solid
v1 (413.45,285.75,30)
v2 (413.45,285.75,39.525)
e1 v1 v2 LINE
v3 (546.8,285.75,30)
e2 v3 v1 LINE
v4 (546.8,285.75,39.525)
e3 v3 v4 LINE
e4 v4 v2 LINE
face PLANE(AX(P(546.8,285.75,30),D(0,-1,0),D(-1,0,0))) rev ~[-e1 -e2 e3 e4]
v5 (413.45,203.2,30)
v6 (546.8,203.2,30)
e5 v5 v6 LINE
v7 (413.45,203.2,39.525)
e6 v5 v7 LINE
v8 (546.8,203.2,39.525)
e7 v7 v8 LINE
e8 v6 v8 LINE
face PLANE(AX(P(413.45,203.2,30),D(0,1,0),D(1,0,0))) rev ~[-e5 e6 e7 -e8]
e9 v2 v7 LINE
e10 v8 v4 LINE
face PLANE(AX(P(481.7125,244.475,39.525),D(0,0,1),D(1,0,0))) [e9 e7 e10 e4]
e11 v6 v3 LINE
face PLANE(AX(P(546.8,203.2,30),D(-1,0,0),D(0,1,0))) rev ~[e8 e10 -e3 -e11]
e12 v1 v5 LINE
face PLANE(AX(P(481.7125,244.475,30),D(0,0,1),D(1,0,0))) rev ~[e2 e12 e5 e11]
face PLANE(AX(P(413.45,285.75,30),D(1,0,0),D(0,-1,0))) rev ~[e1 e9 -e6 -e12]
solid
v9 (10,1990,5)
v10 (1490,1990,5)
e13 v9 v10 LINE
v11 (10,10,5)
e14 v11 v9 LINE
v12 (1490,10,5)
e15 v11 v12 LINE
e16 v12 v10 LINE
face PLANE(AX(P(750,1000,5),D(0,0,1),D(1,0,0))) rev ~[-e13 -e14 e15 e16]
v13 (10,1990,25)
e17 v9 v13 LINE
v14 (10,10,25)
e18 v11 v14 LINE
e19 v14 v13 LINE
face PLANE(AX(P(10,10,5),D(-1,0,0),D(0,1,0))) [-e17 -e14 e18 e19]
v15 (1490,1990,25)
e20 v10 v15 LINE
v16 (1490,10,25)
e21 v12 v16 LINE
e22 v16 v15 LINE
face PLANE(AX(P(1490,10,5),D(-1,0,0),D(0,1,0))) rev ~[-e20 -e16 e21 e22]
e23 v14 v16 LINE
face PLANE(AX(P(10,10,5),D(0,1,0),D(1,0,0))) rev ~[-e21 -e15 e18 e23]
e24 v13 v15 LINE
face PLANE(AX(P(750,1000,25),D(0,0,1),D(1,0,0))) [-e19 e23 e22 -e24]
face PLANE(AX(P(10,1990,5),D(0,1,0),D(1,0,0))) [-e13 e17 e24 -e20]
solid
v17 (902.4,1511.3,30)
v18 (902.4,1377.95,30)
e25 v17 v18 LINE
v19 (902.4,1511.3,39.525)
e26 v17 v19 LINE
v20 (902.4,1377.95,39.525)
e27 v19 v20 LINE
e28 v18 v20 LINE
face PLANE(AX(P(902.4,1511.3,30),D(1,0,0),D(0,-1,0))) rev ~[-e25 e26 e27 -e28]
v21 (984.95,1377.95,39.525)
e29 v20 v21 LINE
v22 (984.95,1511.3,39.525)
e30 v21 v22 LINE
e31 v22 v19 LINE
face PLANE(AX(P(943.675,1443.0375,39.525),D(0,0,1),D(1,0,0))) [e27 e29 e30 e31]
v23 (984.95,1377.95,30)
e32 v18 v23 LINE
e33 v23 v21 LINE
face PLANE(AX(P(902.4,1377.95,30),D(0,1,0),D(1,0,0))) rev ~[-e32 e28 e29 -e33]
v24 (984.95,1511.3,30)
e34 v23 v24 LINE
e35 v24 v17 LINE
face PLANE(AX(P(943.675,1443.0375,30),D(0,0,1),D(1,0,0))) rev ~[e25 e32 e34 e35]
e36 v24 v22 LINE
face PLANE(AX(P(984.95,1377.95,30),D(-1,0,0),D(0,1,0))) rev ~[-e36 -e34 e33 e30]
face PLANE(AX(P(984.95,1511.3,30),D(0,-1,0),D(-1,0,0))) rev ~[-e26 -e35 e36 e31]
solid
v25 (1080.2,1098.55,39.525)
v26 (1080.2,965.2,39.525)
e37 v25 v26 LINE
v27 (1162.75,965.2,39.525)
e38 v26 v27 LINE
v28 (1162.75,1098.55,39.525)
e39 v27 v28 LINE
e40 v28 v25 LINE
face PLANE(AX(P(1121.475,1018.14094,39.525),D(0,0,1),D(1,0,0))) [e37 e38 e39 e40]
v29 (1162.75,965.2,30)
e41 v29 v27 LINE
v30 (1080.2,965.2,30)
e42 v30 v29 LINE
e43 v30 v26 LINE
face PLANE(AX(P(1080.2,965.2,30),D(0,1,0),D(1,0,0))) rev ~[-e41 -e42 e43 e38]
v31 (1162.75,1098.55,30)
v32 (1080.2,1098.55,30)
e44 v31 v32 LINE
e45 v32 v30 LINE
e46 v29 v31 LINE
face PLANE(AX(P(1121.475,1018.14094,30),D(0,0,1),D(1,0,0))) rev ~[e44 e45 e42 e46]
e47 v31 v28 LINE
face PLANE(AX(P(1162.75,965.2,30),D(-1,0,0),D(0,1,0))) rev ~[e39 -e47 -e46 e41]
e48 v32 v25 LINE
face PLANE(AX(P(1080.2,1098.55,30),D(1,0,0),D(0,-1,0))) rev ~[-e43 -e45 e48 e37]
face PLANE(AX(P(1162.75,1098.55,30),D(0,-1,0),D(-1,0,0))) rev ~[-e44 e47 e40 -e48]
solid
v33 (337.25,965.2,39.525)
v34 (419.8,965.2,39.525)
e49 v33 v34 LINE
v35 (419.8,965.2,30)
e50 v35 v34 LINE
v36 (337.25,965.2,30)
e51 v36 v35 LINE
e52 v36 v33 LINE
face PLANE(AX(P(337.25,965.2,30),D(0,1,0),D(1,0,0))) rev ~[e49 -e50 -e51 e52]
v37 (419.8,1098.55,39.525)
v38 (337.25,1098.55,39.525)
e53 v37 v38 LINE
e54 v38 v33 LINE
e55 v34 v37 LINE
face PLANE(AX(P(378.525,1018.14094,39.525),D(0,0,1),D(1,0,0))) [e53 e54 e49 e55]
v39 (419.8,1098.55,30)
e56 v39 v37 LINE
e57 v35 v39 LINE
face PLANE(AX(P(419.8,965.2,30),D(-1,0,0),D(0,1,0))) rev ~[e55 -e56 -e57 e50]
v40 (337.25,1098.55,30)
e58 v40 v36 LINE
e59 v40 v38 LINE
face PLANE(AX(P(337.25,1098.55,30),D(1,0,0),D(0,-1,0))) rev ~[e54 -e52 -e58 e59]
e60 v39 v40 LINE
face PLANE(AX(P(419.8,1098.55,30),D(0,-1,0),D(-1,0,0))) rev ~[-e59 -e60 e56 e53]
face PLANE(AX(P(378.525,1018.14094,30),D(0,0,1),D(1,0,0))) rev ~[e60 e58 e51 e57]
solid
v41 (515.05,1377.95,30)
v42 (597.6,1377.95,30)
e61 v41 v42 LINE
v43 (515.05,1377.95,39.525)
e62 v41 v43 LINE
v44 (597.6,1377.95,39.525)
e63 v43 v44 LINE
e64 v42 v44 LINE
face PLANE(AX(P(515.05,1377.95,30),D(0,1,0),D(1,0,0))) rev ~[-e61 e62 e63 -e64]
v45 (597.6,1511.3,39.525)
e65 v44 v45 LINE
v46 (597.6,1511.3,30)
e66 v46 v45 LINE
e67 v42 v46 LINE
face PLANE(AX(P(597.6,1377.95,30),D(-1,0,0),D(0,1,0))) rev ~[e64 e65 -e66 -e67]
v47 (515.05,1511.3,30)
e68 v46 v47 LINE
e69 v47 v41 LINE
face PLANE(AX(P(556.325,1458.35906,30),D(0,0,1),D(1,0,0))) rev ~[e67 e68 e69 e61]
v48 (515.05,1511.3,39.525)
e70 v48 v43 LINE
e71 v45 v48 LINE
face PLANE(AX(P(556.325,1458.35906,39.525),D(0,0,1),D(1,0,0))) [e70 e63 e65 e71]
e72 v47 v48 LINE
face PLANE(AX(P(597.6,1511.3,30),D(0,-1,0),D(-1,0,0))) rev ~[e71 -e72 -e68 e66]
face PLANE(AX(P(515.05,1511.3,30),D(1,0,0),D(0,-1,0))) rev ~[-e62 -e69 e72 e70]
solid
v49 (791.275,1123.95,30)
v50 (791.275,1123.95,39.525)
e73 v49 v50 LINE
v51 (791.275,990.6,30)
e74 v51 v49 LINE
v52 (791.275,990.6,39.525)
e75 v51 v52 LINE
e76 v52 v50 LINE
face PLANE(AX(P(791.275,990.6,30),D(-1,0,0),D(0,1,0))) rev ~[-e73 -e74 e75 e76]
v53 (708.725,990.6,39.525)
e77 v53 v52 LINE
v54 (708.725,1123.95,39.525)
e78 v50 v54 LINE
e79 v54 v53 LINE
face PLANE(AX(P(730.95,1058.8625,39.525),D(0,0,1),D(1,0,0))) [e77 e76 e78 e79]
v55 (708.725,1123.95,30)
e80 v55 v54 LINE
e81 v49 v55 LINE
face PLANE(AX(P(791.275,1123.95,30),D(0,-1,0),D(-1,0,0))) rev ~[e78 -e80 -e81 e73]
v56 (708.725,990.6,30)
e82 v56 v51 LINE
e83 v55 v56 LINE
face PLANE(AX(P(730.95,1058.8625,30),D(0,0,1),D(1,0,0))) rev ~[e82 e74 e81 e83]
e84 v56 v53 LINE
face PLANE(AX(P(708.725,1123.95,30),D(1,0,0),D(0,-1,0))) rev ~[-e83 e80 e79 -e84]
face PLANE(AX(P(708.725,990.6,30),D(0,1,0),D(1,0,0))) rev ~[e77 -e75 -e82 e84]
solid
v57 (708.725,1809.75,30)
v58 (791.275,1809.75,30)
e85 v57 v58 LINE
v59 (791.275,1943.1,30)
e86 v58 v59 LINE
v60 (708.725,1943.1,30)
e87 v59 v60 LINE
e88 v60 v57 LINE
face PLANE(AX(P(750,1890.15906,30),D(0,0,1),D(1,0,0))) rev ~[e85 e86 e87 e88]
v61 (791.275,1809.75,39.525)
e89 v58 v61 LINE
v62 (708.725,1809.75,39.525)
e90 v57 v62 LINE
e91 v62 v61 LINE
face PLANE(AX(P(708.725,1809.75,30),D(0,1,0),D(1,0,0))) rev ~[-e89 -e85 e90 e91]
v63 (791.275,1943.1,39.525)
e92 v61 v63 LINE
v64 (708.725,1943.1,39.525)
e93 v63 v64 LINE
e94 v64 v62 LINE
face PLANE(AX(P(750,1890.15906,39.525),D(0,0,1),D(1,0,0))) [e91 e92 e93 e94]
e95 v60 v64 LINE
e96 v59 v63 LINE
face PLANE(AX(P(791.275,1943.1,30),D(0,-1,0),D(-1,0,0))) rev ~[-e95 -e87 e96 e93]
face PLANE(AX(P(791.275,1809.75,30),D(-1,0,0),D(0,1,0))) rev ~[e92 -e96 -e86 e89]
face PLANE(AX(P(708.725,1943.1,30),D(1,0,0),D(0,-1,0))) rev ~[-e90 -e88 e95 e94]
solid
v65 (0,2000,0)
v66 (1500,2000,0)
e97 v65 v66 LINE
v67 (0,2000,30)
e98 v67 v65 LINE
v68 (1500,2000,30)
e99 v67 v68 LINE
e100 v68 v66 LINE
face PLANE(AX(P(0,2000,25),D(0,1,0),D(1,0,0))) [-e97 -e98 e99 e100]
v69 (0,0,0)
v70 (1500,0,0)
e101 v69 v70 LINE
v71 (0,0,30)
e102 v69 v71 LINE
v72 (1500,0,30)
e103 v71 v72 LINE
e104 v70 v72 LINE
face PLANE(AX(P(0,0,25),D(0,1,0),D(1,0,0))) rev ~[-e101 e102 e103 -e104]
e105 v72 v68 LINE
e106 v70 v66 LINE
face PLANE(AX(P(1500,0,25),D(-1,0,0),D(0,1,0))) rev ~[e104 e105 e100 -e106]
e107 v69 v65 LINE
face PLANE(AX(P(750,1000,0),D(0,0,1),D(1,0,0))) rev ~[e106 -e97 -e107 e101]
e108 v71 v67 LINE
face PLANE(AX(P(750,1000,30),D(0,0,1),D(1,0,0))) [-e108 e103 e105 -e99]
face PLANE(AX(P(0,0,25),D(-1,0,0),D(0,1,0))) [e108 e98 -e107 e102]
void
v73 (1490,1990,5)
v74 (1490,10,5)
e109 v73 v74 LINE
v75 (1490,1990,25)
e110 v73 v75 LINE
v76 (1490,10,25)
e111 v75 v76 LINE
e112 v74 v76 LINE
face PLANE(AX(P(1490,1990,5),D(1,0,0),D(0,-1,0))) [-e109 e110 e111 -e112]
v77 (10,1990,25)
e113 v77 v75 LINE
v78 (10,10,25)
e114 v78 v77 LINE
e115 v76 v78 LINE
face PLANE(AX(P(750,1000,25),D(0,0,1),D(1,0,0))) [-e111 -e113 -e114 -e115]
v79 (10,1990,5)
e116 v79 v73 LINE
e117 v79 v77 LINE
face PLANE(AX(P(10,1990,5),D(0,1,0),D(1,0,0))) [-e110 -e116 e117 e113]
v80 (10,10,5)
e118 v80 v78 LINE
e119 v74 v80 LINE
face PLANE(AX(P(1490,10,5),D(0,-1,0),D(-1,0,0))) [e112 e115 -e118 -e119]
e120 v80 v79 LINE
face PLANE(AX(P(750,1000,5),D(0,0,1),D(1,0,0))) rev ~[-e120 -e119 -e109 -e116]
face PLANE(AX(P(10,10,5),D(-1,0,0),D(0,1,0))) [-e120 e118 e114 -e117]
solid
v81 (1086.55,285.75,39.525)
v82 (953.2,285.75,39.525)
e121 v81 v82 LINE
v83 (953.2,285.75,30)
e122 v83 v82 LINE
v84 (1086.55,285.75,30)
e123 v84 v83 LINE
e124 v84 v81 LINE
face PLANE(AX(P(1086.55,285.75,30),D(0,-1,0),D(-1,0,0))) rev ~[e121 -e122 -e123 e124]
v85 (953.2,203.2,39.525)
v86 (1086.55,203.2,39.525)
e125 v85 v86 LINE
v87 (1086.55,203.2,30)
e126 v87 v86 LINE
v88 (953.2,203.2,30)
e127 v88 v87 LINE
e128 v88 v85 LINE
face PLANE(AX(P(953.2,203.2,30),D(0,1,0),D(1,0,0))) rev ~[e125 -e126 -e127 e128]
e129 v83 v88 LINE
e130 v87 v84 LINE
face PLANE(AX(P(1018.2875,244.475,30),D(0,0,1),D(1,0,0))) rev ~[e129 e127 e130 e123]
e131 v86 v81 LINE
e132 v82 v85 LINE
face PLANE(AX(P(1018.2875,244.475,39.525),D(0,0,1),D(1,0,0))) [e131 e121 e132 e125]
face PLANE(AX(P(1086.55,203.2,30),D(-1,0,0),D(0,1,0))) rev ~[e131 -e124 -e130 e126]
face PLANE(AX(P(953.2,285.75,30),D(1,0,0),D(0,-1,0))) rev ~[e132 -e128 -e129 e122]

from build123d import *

# Parameters (mm, degrees)
F0_W     = 1500
F0_H     = 2000
F1_DEPTH = 5
F2_W     = 1480
F2_H     = 1980
F3_DEPTH = 20
F4_DEPTH = 20
F5_W     = 1500
F5_H     = 2000
F6_DEPTH = 5
F7_W     = 76.2
F7_H     = 130.175
F8_DEPTH = 9.525
F7_W_2   = 130.175
F7_H_2   = 76.2
F7_W_3   = 38.1


# Not quite as in the source:
# - a feature of the source that left no trace in its solid (it failed there, or was rolled back) is left out


with BuildPart() as f1:
    # F0 (on Top) → F1 (new body)
    with BuildSketch(Plane.XY):
        with Locations((750, 1000)):
            Rectangle(F0_W, F0_H)
    extrude(amount=F1_DEPTH)

    # F2 (on face) → F4 (join)
    with BuildSketch(Plane.XY.offset(5)):
        Polygon((0, 2000), (0, 0), (10, 0), (10, 10), (10, 1990), (1490, 1990), (1500, 1990), (1500, 2000), align=None)
        Polygon((10, 10), (10, 0), (1500, 0), (1500, 1990), (1490, 1990), (1490, 10), align=None)
    extrude(amount=F4_DEPTH)

    # F5 (on face) → F6 (join)
    with BuildSketch(Plane.XY.offset(25)):
        with Locations((750, 1000)):
            Rectangle(F5_W, F5_H)
    extrude(amount=F6_DEPTH)


with BuildPart() as f3:
    # F2 (on face) → F3 (new body)
    with BuildSketch(Plane.XY.offset(5)):
        with Locations((750, 1000)):
            Rectangle(F2_W, F2_H)
    extrude(amount=F3_DEPTH)


with BuildPart() as f8:
    # F7 (on face) → F8 (new body)
    with BuildSketch(Plane.XY.offset(30)):
        Polygon((594.425, 1377.95), (597.6, 1377.95), (597.6, 1511.3), (515.05, 1511.3), (515.05, 1377.95), (518.225, 1377.95), (518.225, 1508.125), (594.425, 1508.125), align=None)
        with Locations((556.325, 1443.0375)):
            Rectangle(F7_W, F7_H)
    extrude(amount=F8_DEPTH)


with BuildPart() as f8b:
    # F7 (on face) → F8, piece 2 (new body)
    with BuildSketch(Plane.XY.offset(30)):
        with Locations((943.675, 1443.0375)):
            Rectangle(F7_W, F7_H)
        Polygon((902.4, 1511.3), (902.4, 1377.95), (905.575, 1377.95), (905.575, 1508.125), (981.775, 1508.125), (981.775, 1377.95), (984.95, 1377.95), (984.95, 1511.3), align=None)
    extrude(amount=F8_DEPTH)


with BuildPart() as f8c:
    # F7 (on face) → F8, piece 3 (new body)
    with BuildSketch(Plane.XY.offset(30)):
        Polygon((708.725, 1809.75), (711.9, 1809.75), (711.9, 1939.925), (788.1, 1939.925), (788.1, 1809.75), (791.275, 1809.75), (791.275, 1943.1), (708.725, 1943.1), align=None)
        Polygon((711.9, 1809.75), (750, 1809.75), (788.1, 1809.75), (788.1, 1939.925), (711.9, 1939.925), align=None)
    extrude(amount=F8_DEPTH)


with BuildPart() as f8d:
    # F7 (on face) → F8, piece 4 (new body)
    with BuildSketch(Plane.XY.offset(30)):
        Polygon((419.8, 965.2), (419.8, 990.6), (419.8, 1098.55), (416.625, 1098.55), (416.625, 968.375), (340.425, 968.375), (340.425, 1098.55), (337.25, 1098.55), (337.25, 965.2), align=None)
        with Locations((378.525, 1033.4625)):
            Rectangle(F7_W, F7_H)
    extrude(amount=F8_DEPTH)


with BuildPart() as f8e:
    # F7 (on face) → F8, piece 5 (new body)
    with BuildSketch(Plane.XY.offset(30)):
        with Locations((481.7125, 244.475)):
            Rectangle(F7_W_2, F7_H_2)
        Polygon((413.45, 203.2), (546.8, 203.2), (546.8, 206.375), (416.625, 206.375), (416.625, 282.575), (546.8, 282.575), (546.8, 285.75), (413.45, 285.75), align=None)
    extrude(amount=F8_DEPTH)


with BuildPart() as f8f:
    # F7 (on face) → F8, piece 6 (new body)
    with BuildSketch(Plane.XY.offset(30)):
        with Locations((1018.2875, 244.475)):
            Rectangle(F7_W_2, F7_H_2)
        Polygon((953.2, 206.375), (953.2, 203.2), (1086.55, 203.2), (1086.55, 285.75), (953.2, 285.75), (953.2, 282.575), (1083.375, 282.575), (1083.375, 206.375), align=None)
    extrude(amount=F8_DEPTH)


with BuildPart() as f8g:
    # F7 (on face) → F8, piece 7 (new body)
    with BuildSketch(Plane.XY.offset(30)):
        Polygon((1080.2, 1098.55), (1080.2, 990.6), (1080.2, 965.2), (1162.75, 965.2), (1162.75, 1098.55), (1159.575, 1098.55), (1159.575, 968.375), (1083.375, 968.375), (1083.375, 1098.55), align=None)
        with Locations((1121.475, 1033.4625)):
            Rectangle(F7_W, F7_H)
    extrude(amount=F8_DEPTH)


with BuildPart() as f8h:
    # F7 (on face) → F8, piece 8 (new body)
    with BuildSketch(Plane.XY.offset(30)):
        with Locations((730.95, 1058.8625)):
            Rectangle(F7_W_3, F7_H)
        Polygon((708.725, 990.6), (750, 990.6), (750, 993.775), (711.9, 993.775), (711.9, 1123.95), (708.725, 1123.95), align=None)
        Polygon((750, 993.775), (750, 990.6), (791.275, 990.6), (791.275, 1123.95), (788.1, 1123.95), (788.1, 993.775), align=None)
        with Locations((769.05, 1058.8625)):
            Rectangle(F7_W_3, F7_H)
    extrude(amount=F8_DEPTH)


solid = Compound([f1.part, f3.part, f8.part, f8b.part, f8c.part, f8d.part, f8e.part, f8f.part, f8g.part, f8h.part])
